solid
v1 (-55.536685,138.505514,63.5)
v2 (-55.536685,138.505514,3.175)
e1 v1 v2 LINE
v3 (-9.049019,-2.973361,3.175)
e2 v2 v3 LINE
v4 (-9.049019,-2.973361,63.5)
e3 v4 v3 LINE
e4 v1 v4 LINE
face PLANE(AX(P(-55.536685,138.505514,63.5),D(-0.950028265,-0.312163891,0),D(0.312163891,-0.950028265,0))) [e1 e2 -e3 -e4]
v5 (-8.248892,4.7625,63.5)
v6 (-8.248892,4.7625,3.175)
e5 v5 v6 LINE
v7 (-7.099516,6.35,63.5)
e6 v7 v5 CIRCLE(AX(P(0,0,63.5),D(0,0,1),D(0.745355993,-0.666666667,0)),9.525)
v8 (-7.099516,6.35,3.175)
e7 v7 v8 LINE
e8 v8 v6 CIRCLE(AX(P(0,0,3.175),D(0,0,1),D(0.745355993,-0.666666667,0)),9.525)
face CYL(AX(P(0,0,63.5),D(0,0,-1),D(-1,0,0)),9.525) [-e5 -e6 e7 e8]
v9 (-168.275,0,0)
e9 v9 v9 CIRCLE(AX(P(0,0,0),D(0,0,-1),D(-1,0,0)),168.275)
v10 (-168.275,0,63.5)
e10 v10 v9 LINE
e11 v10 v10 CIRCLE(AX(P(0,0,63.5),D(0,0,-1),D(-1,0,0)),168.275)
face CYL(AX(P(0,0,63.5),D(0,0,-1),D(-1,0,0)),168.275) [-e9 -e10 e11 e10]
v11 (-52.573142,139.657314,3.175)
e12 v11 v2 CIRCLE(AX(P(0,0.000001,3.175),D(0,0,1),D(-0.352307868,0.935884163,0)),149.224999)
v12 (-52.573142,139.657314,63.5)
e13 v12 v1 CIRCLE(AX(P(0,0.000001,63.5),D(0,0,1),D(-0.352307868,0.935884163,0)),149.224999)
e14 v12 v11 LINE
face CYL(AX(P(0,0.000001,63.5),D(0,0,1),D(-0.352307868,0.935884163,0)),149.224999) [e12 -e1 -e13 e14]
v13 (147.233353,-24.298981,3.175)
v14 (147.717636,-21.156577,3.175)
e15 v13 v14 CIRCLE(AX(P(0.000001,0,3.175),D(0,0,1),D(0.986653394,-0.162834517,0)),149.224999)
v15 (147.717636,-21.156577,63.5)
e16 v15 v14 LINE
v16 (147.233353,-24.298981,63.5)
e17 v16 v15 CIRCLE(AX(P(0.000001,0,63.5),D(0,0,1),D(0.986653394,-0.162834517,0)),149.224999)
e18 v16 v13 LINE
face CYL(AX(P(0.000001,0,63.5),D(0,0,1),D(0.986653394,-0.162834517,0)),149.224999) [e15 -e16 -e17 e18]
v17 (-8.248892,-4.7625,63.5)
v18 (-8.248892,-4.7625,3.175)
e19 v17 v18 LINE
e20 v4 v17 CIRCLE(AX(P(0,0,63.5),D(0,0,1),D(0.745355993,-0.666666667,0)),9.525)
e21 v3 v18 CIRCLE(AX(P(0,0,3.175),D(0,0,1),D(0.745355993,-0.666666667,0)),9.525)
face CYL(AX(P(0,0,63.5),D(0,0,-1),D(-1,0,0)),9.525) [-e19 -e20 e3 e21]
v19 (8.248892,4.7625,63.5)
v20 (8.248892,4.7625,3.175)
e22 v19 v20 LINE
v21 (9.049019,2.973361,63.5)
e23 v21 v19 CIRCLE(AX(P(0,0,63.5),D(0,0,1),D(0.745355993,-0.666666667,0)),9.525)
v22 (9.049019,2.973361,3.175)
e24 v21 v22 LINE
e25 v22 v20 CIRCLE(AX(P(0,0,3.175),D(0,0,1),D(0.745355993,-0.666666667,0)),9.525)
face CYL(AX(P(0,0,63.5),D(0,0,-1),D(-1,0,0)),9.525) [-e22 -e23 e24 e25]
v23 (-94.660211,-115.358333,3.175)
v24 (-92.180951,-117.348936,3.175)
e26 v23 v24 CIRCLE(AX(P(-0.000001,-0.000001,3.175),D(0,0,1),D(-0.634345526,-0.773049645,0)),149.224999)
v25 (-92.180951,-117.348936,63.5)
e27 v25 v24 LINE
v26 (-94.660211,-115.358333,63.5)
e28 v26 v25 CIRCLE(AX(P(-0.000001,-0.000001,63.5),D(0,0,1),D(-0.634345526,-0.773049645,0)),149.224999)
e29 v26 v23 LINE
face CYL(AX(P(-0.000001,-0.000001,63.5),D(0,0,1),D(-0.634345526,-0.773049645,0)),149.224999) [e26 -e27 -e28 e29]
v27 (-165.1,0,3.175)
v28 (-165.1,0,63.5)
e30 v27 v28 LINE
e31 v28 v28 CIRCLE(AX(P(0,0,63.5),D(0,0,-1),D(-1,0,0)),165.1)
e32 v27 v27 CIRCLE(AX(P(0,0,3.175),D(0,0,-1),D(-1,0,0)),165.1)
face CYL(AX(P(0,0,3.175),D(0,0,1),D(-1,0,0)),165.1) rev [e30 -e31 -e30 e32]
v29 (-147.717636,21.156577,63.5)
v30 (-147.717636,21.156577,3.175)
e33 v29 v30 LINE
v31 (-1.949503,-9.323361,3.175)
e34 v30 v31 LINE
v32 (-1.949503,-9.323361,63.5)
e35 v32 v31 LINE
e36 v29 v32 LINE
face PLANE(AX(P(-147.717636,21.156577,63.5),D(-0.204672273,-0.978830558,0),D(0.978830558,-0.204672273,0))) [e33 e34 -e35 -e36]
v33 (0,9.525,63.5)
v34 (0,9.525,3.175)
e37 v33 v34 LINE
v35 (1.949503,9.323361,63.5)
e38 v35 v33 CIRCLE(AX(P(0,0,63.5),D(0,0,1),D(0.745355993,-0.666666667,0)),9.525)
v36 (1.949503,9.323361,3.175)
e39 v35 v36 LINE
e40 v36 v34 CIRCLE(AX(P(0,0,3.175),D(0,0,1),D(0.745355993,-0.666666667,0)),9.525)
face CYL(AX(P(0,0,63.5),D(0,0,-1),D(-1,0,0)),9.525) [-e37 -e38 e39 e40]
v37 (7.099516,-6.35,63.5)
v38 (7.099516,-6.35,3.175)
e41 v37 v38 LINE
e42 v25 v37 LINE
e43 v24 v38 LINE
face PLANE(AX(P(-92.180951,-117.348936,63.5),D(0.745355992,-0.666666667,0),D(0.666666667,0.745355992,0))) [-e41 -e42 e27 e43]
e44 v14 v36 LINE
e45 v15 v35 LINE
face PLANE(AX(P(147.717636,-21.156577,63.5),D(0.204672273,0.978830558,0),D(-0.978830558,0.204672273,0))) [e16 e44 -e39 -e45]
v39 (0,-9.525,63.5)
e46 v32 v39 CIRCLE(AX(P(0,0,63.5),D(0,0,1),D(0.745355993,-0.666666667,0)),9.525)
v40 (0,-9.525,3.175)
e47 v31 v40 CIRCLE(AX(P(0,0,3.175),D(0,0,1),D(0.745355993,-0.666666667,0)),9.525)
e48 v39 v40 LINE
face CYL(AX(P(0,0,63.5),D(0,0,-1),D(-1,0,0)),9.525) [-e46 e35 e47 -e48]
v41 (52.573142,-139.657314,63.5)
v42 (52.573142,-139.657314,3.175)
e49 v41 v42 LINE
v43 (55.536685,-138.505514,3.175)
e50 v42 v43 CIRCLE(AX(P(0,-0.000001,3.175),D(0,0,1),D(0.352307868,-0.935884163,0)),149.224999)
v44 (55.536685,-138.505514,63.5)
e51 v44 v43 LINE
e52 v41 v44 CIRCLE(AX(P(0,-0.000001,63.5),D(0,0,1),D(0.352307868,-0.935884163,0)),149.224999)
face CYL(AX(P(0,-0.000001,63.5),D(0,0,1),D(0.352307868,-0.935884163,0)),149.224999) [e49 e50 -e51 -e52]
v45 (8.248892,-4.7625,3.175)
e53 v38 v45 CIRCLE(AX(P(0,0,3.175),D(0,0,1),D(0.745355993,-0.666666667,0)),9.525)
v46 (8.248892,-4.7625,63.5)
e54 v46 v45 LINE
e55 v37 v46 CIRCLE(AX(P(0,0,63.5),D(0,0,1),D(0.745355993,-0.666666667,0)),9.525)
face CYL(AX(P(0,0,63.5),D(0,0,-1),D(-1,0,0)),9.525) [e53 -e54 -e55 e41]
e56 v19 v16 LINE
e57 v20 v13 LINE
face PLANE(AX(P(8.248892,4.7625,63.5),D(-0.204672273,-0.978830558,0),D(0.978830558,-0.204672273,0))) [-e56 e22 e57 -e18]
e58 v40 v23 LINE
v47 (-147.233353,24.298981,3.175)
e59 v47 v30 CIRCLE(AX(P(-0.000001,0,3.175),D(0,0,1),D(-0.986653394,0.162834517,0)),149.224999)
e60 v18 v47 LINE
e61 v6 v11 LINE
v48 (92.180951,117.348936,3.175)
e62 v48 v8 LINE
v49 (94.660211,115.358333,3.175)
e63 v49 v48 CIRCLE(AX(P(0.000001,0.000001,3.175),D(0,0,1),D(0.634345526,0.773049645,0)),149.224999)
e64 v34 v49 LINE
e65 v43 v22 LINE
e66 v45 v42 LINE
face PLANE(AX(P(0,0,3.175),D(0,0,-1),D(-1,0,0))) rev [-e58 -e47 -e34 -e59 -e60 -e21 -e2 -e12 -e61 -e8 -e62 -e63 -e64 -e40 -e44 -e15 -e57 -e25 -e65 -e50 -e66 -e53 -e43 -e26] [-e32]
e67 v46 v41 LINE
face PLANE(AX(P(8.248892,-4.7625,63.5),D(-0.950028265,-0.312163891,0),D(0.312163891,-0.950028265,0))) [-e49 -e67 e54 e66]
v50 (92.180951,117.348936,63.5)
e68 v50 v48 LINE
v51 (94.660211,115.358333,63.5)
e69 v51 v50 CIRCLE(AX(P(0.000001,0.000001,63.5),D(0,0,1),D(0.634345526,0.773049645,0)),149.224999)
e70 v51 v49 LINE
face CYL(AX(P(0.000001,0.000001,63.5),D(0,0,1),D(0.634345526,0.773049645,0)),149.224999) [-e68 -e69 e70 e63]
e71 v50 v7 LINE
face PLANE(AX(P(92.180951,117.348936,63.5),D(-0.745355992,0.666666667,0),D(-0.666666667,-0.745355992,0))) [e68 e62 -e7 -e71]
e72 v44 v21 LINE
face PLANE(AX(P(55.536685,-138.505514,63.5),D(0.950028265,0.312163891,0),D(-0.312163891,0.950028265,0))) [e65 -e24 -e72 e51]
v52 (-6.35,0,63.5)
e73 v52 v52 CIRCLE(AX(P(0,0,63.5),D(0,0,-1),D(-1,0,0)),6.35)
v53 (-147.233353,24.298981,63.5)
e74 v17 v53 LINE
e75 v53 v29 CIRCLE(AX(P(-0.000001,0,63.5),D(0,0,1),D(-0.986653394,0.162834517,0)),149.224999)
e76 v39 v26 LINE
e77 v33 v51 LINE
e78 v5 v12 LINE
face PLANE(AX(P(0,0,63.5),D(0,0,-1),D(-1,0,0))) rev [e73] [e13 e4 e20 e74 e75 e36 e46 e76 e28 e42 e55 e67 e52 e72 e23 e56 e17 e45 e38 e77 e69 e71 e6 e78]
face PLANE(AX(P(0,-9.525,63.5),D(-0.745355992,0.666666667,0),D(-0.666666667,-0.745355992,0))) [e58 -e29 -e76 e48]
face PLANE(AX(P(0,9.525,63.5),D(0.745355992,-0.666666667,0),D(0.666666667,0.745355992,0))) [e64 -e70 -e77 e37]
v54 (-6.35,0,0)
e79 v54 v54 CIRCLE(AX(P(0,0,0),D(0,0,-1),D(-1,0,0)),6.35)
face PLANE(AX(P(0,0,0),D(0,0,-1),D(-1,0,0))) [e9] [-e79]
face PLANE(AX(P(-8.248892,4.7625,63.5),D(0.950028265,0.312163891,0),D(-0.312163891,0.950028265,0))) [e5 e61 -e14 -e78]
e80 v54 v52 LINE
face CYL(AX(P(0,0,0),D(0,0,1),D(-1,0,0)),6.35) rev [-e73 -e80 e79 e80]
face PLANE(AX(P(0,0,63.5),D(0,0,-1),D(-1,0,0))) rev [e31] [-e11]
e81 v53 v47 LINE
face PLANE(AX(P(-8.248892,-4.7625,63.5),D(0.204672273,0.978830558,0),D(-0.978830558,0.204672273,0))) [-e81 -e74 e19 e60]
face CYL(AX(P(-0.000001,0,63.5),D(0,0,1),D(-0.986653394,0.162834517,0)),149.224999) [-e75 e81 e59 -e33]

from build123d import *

# Parameters (mm, degrees)
F4_DEPTH        = 60.325
F4_COPIES_COUNT = 6


# Not quite as in the source:
# - a pattern or mirror of a feature is missing from the dataset's text; its kind, count and spacing are read off the source's solid


with BuildPart() as f2:
    # F0 (on Front) → F2 (revolve)
    with BuildSketch(Plane.XZ):
        Polygon((-9.525, 0), (-6.35, 0), (-6.35, 63.5), (-9.525, 63.5), (-9.525, 38.1), (-9.525, 3.175), (-18.9311246582, 3.175), (-139.6226100799, 3.175), (-165.1, 3.175), (-165.1, 38.1), (-165.1, 63.5), (-168.275, 63.5), (-168.275, 0), (-165.1, 0), (-139.7, 0), (-19.05, 0), align=None)
    revolve(axis=Axis((0, 0, 2.6372056454), (0, 0, -1)))

    # F3 (on face) → F4 (join, through all)
    with BuildSketch(Plane.XY.offset(63.5)):
        with BuildLine():
            Line((-92.1809510877, -117.3489364313), (7.0995158286, -6.35))
            ThreePointArc((7.0995158286, -6.35), (3.8885649667, -8.6950956004), (0, -9.525))
            Line((0, -9.525), (-94.6602110475, -115.3583333333))
            ThreePointArc((-94.6602110475, -115.3583333333), (-93.4258828815, -116.3602381951), (-92.1809510877, -117.3489364313))
        make_face()
    f4 = extrude(amount=-F4_DEPTH)

    # F4_copies: F4 ×6 about axis
    f4_copies_axis = Axis((0, 0, 0), (0, 0, 1))
    for i in range(1, F4_COPIES_COUNT):
        add(f4.rotate(f4_copies_axis, i * 360 / F4_COPIES_COUNT))


solid = f2.part
